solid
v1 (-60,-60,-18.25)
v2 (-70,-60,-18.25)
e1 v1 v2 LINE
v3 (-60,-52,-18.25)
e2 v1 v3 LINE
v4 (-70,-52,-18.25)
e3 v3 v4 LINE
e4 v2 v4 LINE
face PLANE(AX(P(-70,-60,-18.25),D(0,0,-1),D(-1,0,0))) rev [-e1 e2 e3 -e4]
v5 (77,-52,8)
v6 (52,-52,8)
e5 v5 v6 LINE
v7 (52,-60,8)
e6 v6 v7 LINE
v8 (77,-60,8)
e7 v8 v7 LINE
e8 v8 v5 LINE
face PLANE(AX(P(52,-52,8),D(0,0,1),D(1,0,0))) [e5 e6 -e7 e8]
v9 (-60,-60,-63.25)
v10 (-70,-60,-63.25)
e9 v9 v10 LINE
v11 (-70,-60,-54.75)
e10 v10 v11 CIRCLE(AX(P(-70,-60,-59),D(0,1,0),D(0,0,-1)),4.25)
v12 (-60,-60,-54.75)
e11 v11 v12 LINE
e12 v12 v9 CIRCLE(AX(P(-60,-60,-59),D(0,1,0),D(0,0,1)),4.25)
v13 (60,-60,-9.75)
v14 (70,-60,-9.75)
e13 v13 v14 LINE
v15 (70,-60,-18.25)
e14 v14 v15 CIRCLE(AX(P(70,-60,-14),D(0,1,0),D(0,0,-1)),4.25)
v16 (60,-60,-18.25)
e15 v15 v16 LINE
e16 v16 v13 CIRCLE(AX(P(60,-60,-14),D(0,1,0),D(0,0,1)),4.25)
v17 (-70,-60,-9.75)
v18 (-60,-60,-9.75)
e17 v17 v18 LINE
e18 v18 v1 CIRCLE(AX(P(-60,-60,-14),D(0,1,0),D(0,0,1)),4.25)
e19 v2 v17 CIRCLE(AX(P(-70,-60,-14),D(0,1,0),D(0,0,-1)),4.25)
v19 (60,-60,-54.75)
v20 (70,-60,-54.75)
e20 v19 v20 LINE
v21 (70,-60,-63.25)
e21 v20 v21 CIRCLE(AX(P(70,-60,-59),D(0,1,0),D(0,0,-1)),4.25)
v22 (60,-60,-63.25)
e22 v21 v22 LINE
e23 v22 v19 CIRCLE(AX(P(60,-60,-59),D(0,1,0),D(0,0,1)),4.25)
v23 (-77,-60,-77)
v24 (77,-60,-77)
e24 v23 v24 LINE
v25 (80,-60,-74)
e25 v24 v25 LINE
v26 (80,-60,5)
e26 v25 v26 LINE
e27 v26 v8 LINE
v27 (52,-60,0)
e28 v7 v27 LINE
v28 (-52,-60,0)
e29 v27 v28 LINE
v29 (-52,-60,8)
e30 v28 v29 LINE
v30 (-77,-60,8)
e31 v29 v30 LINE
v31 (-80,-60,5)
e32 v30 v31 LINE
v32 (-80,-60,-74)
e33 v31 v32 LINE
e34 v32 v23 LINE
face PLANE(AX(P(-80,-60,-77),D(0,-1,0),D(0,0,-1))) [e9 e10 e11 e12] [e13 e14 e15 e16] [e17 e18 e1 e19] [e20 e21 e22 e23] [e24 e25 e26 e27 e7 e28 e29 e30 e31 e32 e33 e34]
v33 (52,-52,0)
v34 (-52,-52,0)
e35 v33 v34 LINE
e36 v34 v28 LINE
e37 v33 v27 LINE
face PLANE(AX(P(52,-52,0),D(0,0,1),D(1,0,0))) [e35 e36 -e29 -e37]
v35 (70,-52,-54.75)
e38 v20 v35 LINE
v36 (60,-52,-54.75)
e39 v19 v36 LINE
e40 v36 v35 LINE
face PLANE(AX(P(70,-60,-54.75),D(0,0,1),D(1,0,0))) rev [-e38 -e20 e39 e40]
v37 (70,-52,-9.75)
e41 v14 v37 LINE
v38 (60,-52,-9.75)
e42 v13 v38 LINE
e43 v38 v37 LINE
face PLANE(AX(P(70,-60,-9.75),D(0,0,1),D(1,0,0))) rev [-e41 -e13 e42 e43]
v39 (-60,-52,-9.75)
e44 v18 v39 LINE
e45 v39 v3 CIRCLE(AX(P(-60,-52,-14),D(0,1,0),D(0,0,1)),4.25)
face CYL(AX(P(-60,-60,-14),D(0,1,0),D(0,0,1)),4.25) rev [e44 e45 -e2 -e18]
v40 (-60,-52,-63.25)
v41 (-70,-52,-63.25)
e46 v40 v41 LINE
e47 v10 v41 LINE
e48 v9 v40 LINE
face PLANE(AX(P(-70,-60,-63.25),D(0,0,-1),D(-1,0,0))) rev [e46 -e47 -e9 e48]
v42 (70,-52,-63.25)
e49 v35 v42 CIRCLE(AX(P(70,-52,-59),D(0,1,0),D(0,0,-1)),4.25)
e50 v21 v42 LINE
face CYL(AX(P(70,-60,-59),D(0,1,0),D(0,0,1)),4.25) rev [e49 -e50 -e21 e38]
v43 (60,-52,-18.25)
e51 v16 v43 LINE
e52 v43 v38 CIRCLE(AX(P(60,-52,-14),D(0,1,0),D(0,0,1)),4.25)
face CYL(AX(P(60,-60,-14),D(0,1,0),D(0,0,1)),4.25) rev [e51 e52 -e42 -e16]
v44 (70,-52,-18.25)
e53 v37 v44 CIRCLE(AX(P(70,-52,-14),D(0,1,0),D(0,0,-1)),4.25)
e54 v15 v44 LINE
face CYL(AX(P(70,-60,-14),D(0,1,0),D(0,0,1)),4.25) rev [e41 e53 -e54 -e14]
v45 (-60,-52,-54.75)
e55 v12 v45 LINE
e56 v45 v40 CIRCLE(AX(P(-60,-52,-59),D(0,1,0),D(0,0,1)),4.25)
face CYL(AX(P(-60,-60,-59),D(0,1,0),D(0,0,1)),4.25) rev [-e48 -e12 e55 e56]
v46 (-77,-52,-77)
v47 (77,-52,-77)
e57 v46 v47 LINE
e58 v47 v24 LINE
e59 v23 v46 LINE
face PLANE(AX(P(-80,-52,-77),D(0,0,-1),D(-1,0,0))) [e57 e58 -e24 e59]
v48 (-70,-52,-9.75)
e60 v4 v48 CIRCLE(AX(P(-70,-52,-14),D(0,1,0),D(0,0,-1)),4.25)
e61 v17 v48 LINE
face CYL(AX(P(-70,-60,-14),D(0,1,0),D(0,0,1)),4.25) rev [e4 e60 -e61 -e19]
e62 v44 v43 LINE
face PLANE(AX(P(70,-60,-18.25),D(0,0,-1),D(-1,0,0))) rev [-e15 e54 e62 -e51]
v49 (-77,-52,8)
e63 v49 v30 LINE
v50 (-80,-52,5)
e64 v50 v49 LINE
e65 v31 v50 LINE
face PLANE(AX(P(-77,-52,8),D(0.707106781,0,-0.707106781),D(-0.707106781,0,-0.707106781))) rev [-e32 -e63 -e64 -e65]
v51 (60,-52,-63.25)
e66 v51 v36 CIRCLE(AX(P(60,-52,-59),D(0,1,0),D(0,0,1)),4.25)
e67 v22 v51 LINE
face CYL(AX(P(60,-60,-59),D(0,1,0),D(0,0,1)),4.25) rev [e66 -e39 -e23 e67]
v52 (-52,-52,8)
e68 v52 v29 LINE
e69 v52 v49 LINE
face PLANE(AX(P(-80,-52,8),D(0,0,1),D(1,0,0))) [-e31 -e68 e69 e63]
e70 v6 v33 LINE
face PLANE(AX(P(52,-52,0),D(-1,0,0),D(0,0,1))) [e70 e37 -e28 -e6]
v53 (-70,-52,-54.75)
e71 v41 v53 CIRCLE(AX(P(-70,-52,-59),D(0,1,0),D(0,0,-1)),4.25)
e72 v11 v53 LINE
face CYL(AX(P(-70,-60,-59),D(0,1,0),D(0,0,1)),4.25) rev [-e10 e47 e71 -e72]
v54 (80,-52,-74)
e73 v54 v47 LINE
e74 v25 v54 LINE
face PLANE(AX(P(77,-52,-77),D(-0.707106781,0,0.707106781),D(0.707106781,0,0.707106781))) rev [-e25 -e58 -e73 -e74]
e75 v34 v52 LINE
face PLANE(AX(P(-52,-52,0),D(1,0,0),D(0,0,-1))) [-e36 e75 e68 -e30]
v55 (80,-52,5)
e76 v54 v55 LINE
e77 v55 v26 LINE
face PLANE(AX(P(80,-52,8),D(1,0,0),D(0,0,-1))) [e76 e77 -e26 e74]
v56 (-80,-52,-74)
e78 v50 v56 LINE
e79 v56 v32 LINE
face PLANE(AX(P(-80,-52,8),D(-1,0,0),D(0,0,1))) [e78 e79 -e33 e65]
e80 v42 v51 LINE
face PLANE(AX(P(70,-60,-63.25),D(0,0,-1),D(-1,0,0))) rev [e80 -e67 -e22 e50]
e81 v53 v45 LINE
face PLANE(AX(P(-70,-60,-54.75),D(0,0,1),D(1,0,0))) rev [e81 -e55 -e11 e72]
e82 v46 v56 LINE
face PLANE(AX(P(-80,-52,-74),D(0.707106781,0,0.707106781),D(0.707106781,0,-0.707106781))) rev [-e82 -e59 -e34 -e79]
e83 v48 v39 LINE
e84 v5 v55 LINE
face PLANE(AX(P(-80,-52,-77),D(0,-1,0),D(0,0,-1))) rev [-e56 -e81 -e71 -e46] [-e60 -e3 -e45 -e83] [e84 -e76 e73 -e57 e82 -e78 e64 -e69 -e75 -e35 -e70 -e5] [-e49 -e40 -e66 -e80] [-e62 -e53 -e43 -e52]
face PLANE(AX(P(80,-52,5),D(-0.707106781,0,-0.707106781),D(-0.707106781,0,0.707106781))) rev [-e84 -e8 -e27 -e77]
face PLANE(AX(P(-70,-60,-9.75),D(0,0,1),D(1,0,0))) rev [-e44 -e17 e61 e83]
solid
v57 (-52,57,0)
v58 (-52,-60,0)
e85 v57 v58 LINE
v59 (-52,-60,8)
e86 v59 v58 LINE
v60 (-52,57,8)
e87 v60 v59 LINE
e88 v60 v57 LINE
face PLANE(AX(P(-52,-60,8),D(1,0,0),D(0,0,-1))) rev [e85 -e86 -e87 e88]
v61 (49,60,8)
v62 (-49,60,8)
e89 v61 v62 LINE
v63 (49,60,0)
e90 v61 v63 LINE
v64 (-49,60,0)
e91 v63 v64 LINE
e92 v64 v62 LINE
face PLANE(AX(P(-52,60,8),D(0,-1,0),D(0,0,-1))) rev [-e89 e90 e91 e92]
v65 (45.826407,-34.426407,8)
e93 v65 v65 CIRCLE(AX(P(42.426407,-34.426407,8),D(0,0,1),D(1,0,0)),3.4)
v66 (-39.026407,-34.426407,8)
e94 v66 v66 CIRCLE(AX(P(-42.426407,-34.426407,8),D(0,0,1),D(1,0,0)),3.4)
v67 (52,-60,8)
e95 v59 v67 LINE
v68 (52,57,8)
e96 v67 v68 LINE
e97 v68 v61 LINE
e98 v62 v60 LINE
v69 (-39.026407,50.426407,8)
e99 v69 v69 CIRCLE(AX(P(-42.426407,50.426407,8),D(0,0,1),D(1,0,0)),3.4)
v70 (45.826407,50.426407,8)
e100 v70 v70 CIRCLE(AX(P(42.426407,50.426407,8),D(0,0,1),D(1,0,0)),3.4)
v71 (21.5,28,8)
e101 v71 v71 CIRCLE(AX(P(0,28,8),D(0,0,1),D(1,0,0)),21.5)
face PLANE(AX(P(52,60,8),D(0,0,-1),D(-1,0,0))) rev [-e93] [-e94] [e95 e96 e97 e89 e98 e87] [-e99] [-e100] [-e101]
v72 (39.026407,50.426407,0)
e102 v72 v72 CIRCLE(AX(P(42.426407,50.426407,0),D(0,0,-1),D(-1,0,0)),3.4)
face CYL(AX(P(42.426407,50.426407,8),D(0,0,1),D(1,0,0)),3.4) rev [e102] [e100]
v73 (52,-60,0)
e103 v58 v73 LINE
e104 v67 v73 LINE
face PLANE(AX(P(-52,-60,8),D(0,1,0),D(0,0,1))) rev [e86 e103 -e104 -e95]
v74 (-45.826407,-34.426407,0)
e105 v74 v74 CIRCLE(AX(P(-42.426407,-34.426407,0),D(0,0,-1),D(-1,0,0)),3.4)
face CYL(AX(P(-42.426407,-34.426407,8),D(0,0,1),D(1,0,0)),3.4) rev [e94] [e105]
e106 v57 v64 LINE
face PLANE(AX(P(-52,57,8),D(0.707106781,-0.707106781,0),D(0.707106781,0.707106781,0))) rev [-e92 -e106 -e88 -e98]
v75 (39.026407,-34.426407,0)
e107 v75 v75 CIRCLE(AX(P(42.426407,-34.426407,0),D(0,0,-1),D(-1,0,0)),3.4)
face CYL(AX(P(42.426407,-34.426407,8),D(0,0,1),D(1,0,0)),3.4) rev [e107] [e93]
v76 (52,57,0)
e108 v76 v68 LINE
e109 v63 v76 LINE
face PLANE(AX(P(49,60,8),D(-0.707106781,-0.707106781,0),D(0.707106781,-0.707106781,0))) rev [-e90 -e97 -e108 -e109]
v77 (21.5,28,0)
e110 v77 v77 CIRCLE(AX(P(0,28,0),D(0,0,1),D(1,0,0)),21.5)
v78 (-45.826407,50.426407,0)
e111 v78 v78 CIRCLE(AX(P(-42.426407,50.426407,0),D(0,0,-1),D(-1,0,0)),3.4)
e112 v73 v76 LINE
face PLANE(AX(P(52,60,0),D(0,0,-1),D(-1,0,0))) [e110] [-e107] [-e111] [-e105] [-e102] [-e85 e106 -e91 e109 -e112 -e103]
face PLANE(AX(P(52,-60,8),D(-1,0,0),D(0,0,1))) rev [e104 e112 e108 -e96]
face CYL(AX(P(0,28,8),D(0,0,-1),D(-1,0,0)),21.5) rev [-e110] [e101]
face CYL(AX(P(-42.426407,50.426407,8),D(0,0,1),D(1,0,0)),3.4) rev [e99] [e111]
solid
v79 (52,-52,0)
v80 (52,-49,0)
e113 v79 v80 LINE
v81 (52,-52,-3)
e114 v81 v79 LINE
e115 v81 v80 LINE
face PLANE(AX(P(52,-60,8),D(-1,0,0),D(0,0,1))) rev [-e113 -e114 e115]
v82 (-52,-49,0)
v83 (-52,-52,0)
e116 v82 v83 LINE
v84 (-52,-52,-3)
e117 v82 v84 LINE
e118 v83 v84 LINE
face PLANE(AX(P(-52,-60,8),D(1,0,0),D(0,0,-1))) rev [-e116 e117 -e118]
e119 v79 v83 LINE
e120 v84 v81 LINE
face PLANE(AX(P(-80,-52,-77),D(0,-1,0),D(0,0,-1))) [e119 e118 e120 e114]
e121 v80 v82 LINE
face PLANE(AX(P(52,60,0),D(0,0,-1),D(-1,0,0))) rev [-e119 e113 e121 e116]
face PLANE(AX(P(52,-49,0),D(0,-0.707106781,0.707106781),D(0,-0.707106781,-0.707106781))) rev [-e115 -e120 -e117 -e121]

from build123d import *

# Parameters (mm, degrees)
SKETCH1_W                  = 104
SKETCH1_H                  = 120
SKETCH1_R                  = 21.5
BOSS_EXTRUDE1_DEPTH        = 8
BOSS_EXTRUDE2_DEPTH        = 8
FILLET_START               = -52
FILLET_BEAD1_DEPTH         = 104
M8_TAPPED_HOLE1_AT_2_COUNT = 2
M8_TAPPED_HOLE1_AT_2_PITCH = 84.852813742
M8_TAPPED_HOLE1_AT_3_COUNT = 2
M8_TAPPED_HOLE1_AT_3_PITCH = 120
M8_TAPPED_HOLE1_AT_4_COUNT = 2
M8_TAPPED_HOLE1_AT_4_PITCH = 84.852813742
CHAMFER1_SIZE              = 3
CHAMFER2_SIZE              = 3
CUT_EXTRUDE1_DEPTH         = 8


# Read off the part's stored shape, not the designer's step: Fillet Bead1
with BuildPart() as part:
    # Sketch1 → Boss-Extrude1 (new body)
    with BuildSketch(Plane.XY):
        Rectangle(SKETCH1_W, SKETCH1_H)
        with Locations((0, 28)):
            Circle(SKETCH1_R, mode=Mode.SUBTRACT)
    extrude(amount=BOSS_EXTRUDE1_DEPTH)

    # Sketch4 → M8 Tapped Hole1 (revolve, cut)
    with BuildSketch(Plane(origin=(-42.426406871, -34.426406871, 8), x_dir=(0, -1, 0), z_dir=(1, 0, 0))):
        Polygon((0, 0), (0, 21.792926105), (3.4, 19.75), (3.4, 0), align=None)
    m8_tapped_hole1 = revolve(axis=Axis((-42.426406871, -34.426406871, 14.35), (0, 0, -1)), mode=Mode.SUBTRACT)

    # M8 Tapped Hole1 at 2: M8 Tapped Hole1 ×2
    with Locations(*[(i * M8_TAPPED_HOLE1_AT_2_PITCH, 0, 0) for i in range(1, M8_TAPPED_HOLE1_AT_2_COUNT)]):
        add(m8_tapped_hole1, mode=Mode.SUBTRACT)

    # M8 Tapped Hole1 at 3: M8 Tapped Hole1 ×2
    with Locations(*[Vector(0.7071067811865486, 0.7071067811865465, 0) * (i * M8_TAPPED_HOLE1_AT_3_PITCH) for i in range(1, M8_TAPPED_HOLE1_AT_3_COUNT)]):
        add(m8_tapped_hole1, mode=Mode.SUBTRACT)

    # M8 Tapped Hole1 at 4: M8 Tapped Hole1 ×2
    with Locations(*[(0, i * M8_TAPPED_HOLE1_AT_4_PITCH, 0) for i in range(1, M8_TAPPED_HOLE1_AT_4_COUNT)]):
        add(m8_tapped_hole1, mode=Mode.SUBTRACT)

    # Chamfer1
    chamfer1_edges = [part.edges().sort_by_distance(p)[0] for p in [
        (-52, 60, 4),
        (52, 60, 4),
    ]]
    chamfer(chamfer1_edges, length=CHAMFER1_SIZE)


with BuildPart() as body_2:
    # Sketch2 → Boss-Extrude2 (new body)
    with BuildSketch(Plane.XZ.offset(60)):
        Polygon((-52, 0), (-52, 8), (-80, 8), (-80, -77), (80, -77), (80, 8), (52, 8), (52, 0), align=None)
    extrude(amount=-BOSS_EXTRUDE2_DEPTH)

    # Chamfer2
    chamfer2_edges = [body_2.edges().sort_by_distance(p)[0] for p in [
        (-80, -56, 8),
        (80, -56, 8),
        (80, -56, -77),
        (-80, -56, -77),
    ]]
    chamfer(chamfer2_edges, length=CHAMFER2_SIZE)

    # Sketch5 → Cut-Extrude1 (cut)
    with BuildSketch(Plane(origin=(0, -52, 0), x_dir=(1, 0, 0), z_dir=(0, 1, 0))):
        with BuildLine():
            Line((-70, 54.75), (-60, 54.75))
            ThreePointArc((-60, 54.75), (-55.75, 59), (-60, 63.25))
            Line((-60, 63.25), (-70, 63.25))
            ThreePointArc((-70, 63.25), (-74.25, 59), (-70, 54.75))
        make_face()
        with BuildLine():
            Line((-70, 9.75), (-60, 9.75))
            ThreePointArc((-60, 9.75), (-55.75, 14), (-60, 18.25))
            Line((-60, 18.25), (-70, 18.25))
            ThreePointArc((-70, 18.25), (-74.25, 14), (-70, 9.75))
        make_face()
        with BuildLine():
            Line((70, 18.25), (60, 18.25))
            ThreePointArc((60, 18.25), (55.75, 14), (60, 9.75))
            Line((60, 9.75), (70, 9.75))
            ThreePointArc((70, 9.75), (74.25, 14), (70, 18.25))
        make_face()
        with BuildLine():
            Line((70, 63.25), (60, 63.25))
            ThreePointArc((60, 63.25), (55.75, 59), (60, 54.75))
            Line((60, 54.75), (70, 54.75))
            ThreePointArc((70, 54.75), (74.25, 59), (70, 63.25))
        make_face()
    extrude(amount=-CUT_EXTRUDE1_DEPTH, mode=Mode.SUBTRACT)


with BuildPart() as body_3:
    # Fillet Bead1 outline → Fillet Bead1 (new body)
    with BuildSketch(Plane.YZ.offset(FILLET_START)):
        Polygon((-52, -3), (-49, 0), (-52, 0), align=None)
    extrude(amount=FILLET_BEAD1_DEPTH)


solid = Compound([part.part, body_2.part, body_3.part])
